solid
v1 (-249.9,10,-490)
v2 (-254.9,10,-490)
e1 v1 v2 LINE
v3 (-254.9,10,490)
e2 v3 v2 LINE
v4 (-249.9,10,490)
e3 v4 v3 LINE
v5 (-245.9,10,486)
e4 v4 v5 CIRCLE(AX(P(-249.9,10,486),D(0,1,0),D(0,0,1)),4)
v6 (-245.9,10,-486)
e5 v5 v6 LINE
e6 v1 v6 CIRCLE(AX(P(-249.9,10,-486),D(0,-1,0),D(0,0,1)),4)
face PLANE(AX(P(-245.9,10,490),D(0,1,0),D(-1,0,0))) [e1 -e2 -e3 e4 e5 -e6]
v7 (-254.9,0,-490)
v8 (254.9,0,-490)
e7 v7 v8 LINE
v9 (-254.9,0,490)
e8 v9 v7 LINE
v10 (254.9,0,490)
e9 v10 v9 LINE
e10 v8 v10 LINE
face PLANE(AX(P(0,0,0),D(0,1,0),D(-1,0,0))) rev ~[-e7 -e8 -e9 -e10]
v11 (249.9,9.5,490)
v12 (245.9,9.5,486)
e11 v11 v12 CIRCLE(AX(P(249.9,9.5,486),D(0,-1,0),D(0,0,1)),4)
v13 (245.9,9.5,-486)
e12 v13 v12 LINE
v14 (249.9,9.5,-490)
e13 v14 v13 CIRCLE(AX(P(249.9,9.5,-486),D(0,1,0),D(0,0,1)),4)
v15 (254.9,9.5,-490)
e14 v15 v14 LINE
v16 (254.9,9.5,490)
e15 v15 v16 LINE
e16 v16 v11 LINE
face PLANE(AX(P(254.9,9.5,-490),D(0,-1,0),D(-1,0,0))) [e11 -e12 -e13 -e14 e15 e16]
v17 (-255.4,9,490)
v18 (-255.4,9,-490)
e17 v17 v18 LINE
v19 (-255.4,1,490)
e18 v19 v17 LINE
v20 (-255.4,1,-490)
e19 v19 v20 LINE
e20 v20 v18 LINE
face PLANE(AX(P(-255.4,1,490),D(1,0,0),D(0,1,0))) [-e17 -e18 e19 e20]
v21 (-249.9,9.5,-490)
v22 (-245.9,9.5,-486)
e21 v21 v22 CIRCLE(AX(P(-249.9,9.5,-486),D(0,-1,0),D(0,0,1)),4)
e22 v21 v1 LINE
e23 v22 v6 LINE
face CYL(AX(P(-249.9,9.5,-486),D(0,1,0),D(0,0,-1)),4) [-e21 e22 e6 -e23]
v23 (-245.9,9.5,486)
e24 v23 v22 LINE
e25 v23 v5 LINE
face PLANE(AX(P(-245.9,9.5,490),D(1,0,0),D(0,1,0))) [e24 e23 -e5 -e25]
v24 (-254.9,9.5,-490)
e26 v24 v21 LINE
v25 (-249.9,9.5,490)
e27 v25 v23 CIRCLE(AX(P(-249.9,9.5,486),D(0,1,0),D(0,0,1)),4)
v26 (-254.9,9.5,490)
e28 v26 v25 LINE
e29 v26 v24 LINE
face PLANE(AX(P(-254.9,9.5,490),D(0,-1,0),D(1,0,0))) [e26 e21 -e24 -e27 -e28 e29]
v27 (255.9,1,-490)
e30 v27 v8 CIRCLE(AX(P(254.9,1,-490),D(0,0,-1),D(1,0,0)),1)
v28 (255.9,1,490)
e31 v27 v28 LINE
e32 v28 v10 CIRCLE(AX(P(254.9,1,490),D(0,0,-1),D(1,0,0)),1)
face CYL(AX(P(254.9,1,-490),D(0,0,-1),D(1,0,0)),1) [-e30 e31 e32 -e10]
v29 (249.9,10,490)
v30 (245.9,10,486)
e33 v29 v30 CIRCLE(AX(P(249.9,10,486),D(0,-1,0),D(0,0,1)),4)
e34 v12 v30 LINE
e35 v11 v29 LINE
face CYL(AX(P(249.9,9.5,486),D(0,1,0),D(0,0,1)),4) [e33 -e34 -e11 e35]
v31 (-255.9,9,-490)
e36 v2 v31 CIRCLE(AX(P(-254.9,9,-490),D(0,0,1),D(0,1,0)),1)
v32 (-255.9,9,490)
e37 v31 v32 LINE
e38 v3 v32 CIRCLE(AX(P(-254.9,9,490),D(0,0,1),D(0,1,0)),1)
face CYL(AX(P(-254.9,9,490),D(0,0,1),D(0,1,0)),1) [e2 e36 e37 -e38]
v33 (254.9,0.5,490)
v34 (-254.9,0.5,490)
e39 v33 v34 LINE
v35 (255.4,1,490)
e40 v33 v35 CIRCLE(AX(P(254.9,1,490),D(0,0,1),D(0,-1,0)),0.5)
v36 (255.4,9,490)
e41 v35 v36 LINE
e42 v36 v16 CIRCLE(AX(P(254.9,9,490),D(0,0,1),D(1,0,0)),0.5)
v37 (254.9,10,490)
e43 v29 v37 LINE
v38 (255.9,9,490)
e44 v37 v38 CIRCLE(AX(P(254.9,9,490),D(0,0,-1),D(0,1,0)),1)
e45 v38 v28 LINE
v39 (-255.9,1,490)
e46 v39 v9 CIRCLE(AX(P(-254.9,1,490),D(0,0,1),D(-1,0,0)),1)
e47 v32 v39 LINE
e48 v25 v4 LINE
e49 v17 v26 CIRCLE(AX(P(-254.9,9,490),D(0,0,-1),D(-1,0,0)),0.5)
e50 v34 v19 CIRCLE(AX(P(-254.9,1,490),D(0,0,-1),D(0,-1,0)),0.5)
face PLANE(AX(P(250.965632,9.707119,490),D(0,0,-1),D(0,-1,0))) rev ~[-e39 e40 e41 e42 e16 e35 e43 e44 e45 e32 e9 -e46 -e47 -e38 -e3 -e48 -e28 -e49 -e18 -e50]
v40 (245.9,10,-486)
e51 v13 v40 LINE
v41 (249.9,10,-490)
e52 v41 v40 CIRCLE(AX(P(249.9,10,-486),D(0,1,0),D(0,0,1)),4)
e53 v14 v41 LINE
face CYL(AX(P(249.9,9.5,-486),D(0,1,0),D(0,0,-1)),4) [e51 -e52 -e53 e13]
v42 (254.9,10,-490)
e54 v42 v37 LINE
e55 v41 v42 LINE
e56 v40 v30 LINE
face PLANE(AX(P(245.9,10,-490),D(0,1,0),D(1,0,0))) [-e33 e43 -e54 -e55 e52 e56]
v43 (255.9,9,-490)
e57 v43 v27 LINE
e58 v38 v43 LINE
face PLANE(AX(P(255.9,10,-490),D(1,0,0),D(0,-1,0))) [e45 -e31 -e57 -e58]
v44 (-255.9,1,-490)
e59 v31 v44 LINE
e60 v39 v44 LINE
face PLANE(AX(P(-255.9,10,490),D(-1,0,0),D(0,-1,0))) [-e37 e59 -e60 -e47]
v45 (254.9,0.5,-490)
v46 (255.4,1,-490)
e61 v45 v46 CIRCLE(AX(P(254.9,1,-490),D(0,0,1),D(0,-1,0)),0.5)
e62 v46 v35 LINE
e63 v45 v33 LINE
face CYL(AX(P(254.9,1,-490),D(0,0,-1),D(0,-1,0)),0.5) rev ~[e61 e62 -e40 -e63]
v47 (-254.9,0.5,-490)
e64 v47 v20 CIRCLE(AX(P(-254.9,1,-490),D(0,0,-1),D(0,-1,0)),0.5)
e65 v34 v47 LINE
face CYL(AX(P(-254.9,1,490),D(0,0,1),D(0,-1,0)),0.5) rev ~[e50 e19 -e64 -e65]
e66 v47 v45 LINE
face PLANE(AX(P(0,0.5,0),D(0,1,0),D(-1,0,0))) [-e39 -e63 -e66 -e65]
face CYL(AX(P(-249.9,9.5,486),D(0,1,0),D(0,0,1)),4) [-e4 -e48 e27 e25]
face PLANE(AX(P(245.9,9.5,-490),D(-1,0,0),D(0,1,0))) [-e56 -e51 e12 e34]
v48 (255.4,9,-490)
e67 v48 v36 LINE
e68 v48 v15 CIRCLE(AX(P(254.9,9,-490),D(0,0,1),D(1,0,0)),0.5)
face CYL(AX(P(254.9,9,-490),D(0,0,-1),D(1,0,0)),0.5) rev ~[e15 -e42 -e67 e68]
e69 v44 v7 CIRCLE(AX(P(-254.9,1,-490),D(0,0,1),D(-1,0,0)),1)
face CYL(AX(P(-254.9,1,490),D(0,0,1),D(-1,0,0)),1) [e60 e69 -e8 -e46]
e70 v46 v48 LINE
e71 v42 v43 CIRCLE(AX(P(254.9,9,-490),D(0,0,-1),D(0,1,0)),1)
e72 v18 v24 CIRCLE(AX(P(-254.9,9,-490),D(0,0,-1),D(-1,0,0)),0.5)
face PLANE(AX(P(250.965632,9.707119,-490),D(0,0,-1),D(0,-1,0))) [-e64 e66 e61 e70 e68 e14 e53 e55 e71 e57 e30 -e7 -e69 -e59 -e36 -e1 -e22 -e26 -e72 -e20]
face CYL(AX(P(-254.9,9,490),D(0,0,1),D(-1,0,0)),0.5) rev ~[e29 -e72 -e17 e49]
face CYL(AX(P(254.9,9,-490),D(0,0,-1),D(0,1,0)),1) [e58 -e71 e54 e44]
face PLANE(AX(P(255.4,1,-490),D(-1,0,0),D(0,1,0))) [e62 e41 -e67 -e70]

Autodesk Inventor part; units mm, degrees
ref_plane "YZ Plane" through (0, 0, 0) normal (1, 0, 0) x (0, 1, 0)
ref_plane "XZ Plane" through (0, 0, 0) normal (0, 1, 0) x (-1, 0, 0)
ref_plane "XY Plane" through (0, 0, 0) normal (0, 0, 1) x (1, 0, 0)
sketch "Sketch6" plane through (0, 0, 0) normal (0, 1, 0) x (-1, 0, 0)
  line L0 (255.9, -490) -> (-255.9, -490)
  line L1 (-255.9, -490) -> (-255.9, 490)
  line L2 (-255.9, 490) -> (255.9, 490)
  line L3 (255.9, 490) -> (255.9, -490)
  line L4 (255.9, -490) -> (-255.9, 490) construction
  line L5 (-255.9, -490) -> (255.9, 490) construction
  point P0 (0, 0)
  dimension "d52" = 511.8
  dimension "d53" = 980
extrude "Plate2" add sketch "Sketch6" along normal blind 0.5
sketch "Sketch11" plane through (-255.4, 0, 490) normal (-1, 0, 0) x (0, -1, 0)
  line L0 (0, -980) -> (0, 0)
  line L1 (0, 0) -> (-10, 0)
  line L2 (-10, 0) -> (-10, -980)
  line L3 (-10, -980) -> (0, -980)
edge flange "Flange2" height 10 angle 90 thickness 0.5 bend radius 0.5 thickness toward (-1, 0, 0) relief tear relief width 0.5 relief depth 0.25 edges at (-255.9, 0.5, 0) wall of the first edge with corners at (-255.4, 0, -490) (-255.4, 0, 490) (-255.4, 10, 490) (-255.4, 10, -490)
bend "Bend3"
corner "Corner3"
sketch "Sketch12" plane through (-255.9, 9.5, 490) normal (0, 1, 0) x (-1, 0, 0)
  line L0 (0, -980) -> (0, 0)
  line L1 (0, 0) -> (-10, 0)
  line L2 (-10, 0) -> (-10, -980)
  line L3 (-10, -980) -> (0, -980)
edge flange "Flange3" height 10 angle 90 thickness 0.5 bend radius 0.5 thickness toward (0, 1, 0) relief tear relief width 0.5 relief depth 0.25 edges at (-255.4, 10, 0) wall of the first edge with corners at (-255.9, 9.5, -490) (-255.9, 9.5, 490) (-245.9, 9.5, 490) (-245.9, 9.5, -490)
bend "Bend4"
corner "Corner4"
sketch "Sketch13" plane through (255.4, 0, -490) normal (1, 0, 0) x (0, 1, 0)
  line L0 (0, 980) -> (0, 0)
  line L1 (0, 0) -> (10, 0)
  line L2 (10, 0) -> (10, 980)
  line L3 (10, 980) -> (0, 980)
edge flange "Flange4" height 10 angle 90 thickness 0.5 bend radius 0.5 thickness toward (1, 0, 0) relief tear relief width 0.5 relief depth 0.25 edges at (255.9, 0.5, 0) wall of the first edge with corners at (255.4, 0, 490) (255.4, 0, -490) (255.4, 10, -490) (255.4, 10, 490)
bend "Bend5"
corner "Corner5"
sketch "Sketch14" plane through (255.9, 9.5, -490) normal (0, 1, 0) x (-1, 0, 0)
  line L0 (0, 980) -> (0, 0)
  line L1 (0, 0) -> (10, 0)
  line L2 (10, 0) -> (10, 980)
  line L3 (10, 980) -> (0, 980)
edge flange "Flange5" height 10 angle 90 thickness 0.5 bend radius 0.5 thickness toward (0, 1, 0) relief tear relief width 0.5 relief depth 0.25 edges at (255.4, 10, 0) wall of the first edge with corners at (255.9, 9.5, 490) (255.9, 9.5, -490) (245.9, 9.5, -490) (245.9, 9.5, 490)
bend "Bend6"
corner "Corner6"
fillet "Corner Round1" radius 4 4 edges at (245.9, 9.75, -490) (-245.9, 9.75, -490) (-245.9, 9.75, 490) (245.9, 9.75, 490)
equation "\"d52\" = ЖАБРЫ_базовая_ширина - 4 * ЖАБРЫ_шаг_листов"
equation "\"d53\" = ЖАБРЫ_базовая_длина_кор_лист"
equation "\"d54\" = Thickness"
equation "\"d84\" = BendReliefWidth"
equation "\"d85\" = BendReliefDepth"
equation "\"d86\" = MinimumRemnant"
equation "\"d87\" = TransitionRadius"
equation "\"d90\" = BendRadius"
equation "\"d91\" = CornerReliefSize"
equation "\"d92\" = GapSize"
equation "\"d93\" = JacobiRadiusSize"
equation "\"d94\" = BendReliefWidth"
equation "\"d95\" = BendReliefDepth"
equation "\"d96\" = MinimumRemnant"
equation "\"d97\" = TransitionRadius"
equation "\"d100\" = BendRadius"
equation "\"d101\" = CornerReliefSize"
equation "\"d102\" = GapSize"
equation "\"d103\" = JacobiRadiusSize"
equation "\"d104\" = BendReliefWidth"
equation "\"d105\" = BendReliefDepth"
equation "\"d106\" = MinimumRemnant"
equation "\"d107\" = TransitionRadius"
equation "\"d110\" = BendRadius"
equation "\"d111\" = CornerReliefSize"
equation "\"d112\" = GapSize"
equation "\"d113\" = JacobiRadiusSize"
equation "\"d114\" = BendReliefWidth"
equation "\"d115\" = BendReliefDepth"
equation "\"d116\" = MinimumRemnant"
equation "\"d117\" = TransitionRadius"
equation "\"d120\" = BendRadius"
equation "\"d121\" = CornerReliefSize"
equation "\"d122\" = GapSize"
equation "\"d123\" = JacobiRadiusSize"
equation "\"BendRadius\" = Thickness"
equation "\"BendReliefWidth\" = Thickness"
equation "\"BendReliefDepth\" = 0.5 * Thickness"
equation "\"CornerReliefSize\" = 4 * Thickness"
equation "\"MinimumRemnant\" = 2 * Thickness"
equation "\"TransitionRadius\" = BendRadius"
equation "\"JacobiRadiusSize\" = BendRadius"
equation "\"GapSize\" = Thickness"
equation "\"ЖАБРЫ_базовая_ширина\" = 915"
equation "\"ЖАБРЫ_шаг_листов\" = 100.8"
equation "\"ЖАБРЫ_базовая_длина_кор_лист\" = 980"
equation "\"Thickness\" = 0.5"
properties part number "MSC 808 SHEET GILLS" material "Stainless Steel"
